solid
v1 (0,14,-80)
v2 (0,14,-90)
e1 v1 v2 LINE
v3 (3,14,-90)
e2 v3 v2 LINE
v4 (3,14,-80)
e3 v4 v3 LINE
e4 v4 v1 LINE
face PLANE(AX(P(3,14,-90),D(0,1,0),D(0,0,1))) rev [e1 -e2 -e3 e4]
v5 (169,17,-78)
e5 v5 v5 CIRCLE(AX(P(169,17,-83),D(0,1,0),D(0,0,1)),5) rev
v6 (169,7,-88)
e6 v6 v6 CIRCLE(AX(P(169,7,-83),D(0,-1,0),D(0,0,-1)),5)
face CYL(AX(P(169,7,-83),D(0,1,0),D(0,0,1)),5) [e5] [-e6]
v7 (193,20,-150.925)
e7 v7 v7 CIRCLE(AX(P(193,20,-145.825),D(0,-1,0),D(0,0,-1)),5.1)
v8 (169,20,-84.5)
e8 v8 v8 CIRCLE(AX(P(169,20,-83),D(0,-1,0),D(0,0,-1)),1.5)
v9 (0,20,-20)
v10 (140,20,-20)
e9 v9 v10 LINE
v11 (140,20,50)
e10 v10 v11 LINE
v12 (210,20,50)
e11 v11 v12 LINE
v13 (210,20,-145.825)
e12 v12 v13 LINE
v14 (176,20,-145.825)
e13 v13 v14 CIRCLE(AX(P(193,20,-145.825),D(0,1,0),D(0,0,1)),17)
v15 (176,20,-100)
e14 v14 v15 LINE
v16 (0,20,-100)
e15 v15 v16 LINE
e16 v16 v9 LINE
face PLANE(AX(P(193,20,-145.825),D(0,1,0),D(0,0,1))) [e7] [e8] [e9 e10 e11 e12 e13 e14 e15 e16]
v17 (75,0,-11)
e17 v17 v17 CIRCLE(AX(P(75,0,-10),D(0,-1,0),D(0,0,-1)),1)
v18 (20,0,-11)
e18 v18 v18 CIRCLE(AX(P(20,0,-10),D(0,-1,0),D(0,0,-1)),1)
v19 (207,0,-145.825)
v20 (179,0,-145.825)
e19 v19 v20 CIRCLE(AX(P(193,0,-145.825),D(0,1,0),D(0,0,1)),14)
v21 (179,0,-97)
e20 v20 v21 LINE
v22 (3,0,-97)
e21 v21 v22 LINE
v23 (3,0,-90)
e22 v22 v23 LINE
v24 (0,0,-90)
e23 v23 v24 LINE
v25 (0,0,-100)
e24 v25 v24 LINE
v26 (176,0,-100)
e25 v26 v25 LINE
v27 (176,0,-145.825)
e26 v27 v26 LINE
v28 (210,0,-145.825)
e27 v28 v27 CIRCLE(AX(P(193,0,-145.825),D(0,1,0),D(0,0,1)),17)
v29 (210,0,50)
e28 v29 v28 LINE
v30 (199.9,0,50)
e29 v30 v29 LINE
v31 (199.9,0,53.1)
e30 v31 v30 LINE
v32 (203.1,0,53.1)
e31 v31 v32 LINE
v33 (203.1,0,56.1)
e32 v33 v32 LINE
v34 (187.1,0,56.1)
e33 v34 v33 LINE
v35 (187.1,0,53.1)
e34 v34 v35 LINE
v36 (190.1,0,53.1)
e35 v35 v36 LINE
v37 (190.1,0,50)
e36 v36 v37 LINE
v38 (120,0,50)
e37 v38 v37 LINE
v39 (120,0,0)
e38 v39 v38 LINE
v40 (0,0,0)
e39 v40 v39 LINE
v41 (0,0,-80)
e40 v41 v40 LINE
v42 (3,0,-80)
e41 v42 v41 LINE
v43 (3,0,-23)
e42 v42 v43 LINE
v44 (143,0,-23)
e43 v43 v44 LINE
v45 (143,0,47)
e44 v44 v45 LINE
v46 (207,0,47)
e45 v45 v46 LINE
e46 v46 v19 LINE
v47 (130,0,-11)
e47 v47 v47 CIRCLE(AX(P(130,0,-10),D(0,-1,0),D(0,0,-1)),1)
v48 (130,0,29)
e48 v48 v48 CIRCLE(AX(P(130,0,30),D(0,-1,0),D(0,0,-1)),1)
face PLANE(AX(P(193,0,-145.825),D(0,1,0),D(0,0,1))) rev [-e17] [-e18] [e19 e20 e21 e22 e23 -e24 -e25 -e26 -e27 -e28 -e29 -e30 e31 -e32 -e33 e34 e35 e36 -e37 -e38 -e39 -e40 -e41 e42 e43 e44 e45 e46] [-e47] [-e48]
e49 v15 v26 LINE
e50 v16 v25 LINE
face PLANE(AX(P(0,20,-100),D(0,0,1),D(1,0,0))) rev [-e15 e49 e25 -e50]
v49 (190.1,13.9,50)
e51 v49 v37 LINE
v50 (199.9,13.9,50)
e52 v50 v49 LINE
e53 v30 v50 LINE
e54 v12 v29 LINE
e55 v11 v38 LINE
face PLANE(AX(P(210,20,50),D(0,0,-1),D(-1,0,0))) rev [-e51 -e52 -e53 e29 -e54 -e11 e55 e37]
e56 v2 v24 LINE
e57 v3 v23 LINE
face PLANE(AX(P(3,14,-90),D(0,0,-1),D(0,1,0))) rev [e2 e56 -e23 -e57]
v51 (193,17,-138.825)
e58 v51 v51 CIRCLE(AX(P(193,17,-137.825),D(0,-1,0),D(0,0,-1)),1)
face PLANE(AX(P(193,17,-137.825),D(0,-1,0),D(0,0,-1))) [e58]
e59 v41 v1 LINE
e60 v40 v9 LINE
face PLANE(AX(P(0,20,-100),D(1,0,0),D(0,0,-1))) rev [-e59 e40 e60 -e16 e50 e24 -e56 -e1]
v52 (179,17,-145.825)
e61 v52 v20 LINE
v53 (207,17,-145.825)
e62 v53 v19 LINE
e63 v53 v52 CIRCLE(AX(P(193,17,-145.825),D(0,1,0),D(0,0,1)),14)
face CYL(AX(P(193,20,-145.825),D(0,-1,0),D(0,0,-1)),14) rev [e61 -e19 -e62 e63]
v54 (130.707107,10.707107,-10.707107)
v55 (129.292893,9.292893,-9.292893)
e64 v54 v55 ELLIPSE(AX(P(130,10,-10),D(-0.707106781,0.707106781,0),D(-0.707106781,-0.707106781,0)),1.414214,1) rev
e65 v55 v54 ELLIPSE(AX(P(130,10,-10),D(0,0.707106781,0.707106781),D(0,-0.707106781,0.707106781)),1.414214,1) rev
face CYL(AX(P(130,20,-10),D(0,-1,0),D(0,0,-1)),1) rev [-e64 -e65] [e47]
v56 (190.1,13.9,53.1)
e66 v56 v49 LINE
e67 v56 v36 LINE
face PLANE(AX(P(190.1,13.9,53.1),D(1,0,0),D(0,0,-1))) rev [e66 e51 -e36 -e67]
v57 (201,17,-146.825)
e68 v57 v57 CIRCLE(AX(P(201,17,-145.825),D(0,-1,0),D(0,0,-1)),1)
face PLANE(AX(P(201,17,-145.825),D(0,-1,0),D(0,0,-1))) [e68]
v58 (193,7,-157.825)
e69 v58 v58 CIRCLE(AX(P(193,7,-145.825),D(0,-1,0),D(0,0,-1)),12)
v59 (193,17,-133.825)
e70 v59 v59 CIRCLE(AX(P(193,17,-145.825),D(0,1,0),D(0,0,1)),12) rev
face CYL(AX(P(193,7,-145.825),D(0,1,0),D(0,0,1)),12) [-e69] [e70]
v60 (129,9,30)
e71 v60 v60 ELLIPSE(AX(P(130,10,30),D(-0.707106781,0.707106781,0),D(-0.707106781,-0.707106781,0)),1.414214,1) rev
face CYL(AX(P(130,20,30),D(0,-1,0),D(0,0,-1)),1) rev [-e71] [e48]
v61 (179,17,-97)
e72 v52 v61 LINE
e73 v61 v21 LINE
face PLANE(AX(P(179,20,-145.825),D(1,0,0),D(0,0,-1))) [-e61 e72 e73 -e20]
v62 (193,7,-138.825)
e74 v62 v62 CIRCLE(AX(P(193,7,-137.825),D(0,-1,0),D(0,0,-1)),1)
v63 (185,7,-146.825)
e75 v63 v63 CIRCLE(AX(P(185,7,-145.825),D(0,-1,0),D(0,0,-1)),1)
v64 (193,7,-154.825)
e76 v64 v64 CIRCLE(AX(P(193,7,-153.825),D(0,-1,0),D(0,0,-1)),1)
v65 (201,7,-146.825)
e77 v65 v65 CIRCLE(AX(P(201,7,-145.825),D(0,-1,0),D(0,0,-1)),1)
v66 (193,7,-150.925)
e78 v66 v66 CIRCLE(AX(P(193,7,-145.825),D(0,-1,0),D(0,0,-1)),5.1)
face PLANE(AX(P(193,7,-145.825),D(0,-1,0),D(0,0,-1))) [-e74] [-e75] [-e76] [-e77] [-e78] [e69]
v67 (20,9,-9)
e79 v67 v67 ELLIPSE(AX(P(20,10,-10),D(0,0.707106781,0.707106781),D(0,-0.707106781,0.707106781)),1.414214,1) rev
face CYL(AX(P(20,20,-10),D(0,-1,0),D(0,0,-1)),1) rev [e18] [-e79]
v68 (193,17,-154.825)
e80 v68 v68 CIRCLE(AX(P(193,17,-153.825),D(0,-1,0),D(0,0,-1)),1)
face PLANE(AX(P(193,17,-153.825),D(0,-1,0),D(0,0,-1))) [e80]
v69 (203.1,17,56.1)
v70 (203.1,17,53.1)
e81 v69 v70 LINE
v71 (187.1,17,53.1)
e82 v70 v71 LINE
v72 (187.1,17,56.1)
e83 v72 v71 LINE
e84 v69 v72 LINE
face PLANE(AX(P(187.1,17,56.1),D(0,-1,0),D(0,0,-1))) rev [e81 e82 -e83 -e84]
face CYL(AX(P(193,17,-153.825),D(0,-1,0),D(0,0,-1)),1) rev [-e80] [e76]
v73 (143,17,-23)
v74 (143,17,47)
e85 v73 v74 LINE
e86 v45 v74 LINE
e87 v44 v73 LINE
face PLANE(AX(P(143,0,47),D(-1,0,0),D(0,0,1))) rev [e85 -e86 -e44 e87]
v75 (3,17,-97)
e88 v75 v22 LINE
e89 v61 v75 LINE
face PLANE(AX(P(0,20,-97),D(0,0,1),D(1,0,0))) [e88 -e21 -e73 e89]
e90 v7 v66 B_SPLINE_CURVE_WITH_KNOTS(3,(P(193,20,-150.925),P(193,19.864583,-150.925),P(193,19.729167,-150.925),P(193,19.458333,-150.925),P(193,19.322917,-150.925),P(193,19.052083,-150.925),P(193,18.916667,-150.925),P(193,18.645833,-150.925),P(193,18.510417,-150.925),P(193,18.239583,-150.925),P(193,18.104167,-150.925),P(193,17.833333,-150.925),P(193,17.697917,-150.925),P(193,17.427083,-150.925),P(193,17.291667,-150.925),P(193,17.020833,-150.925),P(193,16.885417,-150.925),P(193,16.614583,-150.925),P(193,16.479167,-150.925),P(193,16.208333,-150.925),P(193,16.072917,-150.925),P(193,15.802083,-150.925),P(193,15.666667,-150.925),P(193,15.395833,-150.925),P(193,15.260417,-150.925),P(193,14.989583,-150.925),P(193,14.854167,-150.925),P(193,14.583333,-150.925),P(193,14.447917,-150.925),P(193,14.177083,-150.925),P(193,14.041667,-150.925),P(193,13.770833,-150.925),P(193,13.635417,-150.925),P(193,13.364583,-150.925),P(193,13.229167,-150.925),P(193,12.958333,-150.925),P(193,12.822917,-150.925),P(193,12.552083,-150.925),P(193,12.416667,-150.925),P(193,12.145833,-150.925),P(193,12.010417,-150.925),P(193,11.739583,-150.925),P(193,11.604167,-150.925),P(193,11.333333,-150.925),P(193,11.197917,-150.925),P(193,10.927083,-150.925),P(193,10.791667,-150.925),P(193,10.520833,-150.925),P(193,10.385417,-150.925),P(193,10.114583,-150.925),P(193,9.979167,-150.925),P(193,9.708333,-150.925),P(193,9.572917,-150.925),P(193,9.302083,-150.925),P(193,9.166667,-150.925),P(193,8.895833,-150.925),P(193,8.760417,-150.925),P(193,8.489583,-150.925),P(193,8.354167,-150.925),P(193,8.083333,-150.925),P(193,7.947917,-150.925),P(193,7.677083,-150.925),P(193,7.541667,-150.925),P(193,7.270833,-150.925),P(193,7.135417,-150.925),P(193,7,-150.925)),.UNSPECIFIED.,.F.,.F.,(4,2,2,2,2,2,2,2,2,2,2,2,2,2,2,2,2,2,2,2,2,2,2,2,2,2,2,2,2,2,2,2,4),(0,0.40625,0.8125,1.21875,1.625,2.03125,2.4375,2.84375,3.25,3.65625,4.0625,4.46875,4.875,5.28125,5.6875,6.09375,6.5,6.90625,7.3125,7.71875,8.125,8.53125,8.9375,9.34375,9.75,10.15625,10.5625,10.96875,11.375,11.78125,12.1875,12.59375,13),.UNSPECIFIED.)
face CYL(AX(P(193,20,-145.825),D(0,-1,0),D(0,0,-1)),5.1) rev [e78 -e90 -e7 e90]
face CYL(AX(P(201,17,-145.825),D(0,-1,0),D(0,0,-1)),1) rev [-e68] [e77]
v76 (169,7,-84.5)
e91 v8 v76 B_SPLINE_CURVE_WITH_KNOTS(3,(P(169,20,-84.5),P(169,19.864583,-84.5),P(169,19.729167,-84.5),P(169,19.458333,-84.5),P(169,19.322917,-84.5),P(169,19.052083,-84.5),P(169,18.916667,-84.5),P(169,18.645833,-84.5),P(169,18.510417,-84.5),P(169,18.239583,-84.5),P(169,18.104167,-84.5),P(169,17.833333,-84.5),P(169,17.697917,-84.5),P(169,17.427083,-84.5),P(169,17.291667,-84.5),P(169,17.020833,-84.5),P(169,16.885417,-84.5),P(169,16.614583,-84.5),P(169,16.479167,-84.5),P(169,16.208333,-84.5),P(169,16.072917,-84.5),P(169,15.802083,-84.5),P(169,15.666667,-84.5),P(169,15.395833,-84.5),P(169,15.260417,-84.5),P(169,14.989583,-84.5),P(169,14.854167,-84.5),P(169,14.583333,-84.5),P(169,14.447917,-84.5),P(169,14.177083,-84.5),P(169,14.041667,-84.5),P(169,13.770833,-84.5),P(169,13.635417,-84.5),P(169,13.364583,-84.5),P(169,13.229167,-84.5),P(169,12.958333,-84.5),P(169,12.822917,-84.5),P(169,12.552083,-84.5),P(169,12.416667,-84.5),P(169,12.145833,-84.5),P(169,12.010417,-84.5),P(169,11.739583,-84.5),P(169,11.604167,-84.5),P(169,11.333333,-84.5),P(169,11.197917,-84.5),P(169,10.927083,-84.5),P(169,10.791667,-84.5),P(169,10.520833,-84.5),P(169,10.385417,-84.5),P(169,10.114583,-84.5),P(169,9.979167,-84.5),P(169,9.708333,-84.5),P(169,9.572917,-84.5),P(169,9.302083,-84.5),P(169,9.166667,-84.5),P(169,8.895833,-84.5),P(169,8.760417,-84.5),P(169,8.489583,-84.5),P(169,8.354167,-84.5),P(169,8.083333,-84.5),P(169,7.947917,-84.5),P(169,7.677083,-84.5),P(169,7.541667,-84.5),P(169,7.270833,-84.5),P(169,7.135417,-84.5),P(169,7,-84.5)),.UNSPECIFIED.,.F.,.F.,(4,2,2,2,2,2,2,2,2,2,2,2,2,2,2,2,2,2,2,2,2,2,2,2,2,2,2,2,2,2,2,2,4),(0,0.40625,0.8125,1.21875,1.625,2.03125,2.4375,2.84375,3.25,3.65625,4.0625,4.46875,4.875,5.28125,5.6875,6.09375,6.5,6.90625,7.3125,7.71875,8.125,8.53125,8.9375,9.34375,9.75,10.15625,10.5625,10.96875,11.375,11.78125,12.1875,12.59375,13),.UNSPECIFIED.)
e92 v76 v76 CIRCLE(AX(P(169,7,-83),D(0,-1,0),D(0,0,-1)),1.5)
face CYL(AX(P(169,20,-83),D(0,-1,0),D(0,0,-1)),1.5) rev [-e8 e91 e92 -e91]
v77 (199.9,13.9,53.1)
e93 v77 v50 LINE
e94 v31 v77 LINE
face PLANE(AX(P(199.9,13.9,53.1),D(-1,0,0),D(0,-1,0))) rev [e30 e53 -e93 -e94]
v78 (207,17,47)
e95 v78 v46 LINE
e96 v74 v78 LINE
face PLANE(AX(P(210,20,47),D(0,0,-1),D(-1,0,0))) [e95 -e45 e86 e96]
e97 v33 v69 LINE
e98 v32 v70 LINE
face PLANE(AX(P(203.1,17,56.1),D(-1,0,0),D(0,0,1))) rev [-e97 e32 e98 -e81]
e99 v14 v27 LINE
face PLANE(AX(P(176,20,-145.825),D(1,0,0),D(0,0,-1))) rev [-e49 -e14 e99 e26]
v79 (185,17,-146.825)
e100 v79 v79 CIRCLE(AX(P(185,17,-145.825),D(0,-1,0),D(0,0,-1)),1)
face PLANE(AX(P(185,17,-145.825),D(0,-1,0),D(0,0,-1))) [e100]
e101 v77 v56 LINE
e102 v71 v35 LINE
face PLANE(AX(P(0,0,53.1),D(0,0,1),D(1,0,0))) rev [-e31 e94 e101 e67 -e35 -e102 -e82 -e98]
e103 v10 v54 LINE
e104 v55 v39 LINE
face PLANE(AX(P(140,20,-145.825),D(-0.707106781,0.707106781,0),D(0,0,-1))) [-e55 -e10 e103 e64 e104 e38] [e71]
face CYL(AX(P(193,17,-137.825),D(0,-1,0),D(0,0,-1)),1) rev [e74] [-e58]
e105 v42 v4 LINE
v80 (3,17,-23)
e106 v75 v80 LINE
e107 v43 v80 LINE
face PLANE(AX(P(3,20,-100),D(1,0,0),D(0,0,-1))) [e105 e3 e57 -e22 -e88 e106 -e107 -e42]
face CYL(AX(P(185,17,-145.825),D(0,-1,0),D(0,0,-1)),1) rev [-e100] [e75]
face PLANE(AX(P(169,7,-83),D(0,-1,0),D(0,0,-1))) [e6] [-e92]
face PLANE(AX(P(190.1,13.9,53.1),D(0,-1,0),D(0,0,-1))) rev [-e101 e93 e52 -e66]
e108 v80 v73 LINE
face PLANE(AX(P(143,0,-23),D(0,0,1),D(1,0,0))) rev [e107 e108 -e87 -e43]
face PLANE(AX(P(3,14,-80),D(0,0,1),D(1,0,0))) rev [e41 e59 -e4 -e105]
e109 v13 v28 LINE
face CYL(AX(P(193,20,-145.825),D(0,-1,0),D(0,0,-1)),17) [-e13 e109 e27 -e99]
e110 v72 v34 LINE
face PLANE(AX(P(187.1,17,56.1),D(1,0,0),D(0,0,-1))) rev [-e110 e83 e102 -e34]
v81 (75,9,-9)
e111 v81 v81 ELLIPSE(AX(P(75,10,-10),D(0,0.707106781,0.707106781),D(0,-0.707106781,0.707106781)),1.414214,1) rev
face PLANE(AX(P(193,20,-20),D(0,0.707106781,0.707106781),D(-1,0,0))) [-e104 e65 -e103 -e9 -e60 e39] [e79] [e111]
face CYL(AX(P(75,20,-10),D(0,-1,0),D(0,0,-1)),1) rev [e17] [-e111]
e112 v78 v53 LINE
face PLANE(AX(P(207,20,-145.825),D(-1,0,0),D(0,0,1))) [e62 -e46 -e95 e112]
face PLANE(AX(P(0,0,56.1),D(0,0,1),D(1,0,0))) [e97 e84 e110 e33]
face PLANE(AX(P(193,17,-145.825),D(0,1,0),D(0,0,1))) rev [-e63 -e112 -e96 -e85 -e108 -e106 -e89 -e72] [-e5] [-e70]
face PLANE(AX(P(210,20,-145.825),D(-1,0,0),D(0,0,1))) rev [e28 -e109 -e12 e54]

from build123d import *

# Parameters (mm, degrees)
CORNERBOSS_EXTRUDE1_DEPTH               = 20
SHELL1_T                                = -3
PUTBACKPARTOFSHELLBOSS_EXTRUDE1_DEPTH   = 17
TABHOLECUTSSKETCH1_R                    = 1
TABHOLECUTS_EXTRUDE3_DEPTH              = 267.480732183
PADSKETCH2_R                            = 12
PADSKETCH2_R_2                          = 5
PADBOSS_EXTRUDE2_DEPTH                  = 10
STEPPERRODHOLESKETCH3_R                 = 5.1
STEPPERRODHOLESKETCH3_R_2               = 1.5
STEPPERRODHOLECUT_EXTRUDE1_DEPTH        = 267.046951918
THREADEDNUTMOUNTHOLESSKETCH4_R          = 1
THREADEDNUTMOUNTHOLESCUT_EXTRUDE2_DEPTH = 10
TLPEGHOLESKETCH1_W                      = 10
TLPEGHOLESKETCH1_H                      = 14
TLPEGHOLECUT_EXTRUDE1_DEPTH             = 3
BOTTOMPEGSKETCH2_W                      = 9.8
BOTTOMPEGSKETCH2_H                      = 13.9
BOTTOMPEGBOSS_EXTRUDE1_DEPTH            = 3.1
BOTTOMPEGCAPSKETCH3_W                   = 16
BOTTOMPEGCAPSKETCH3_H                   = 17
BOTTOMPEGCAPBOSS_EXTRUDE2_DEPTH         = 3


with BuildPart() as part:
    # CornerSketch1 → CornerBoss-Extrude1 (new body)
    with BuildSketch(Plane(origin=(0, 0, 0), x_dir=(1, 0, 0), z_dir=(0, 1, 0))):
        with BuildLine():
            Line((210, -50), (120, -50))
            Line((120, -50), (120, 0))
            Line((120, 0), (0, 0))
            Line((0, 0), (0, 100))
            Line((0, 100), (176, 100))
            Line((176, 100), (176, 145.825))
            ThreePointArc((176, 145.825), (193, 162.825), (210, 145.825))
            Line((210, 145.825), (210, -50))
        make_face()
    extrude(amount=CORNERBOSS_EXTRUDE1_DEPTH)

    # Shell1
    shell1_openings = [part.faces().sort_by_distance(p)[0] for p in [
        (121.249517572, 0, -43.561989295),
    ]]
    offset(amount=SHELL1_T, openings=shell1_openings, kind=Kind.INTERSECTION)

    # PutBackPartOfShellSketch1 → PutBackPartOfShellBoss-Extrude1 (add)
    with BuildSketch(Plane.XZ.offset(-17)):
        Polygon((3, -3), (123, -3), (123, 47), (143, 47), (143, -23), (3, -23), align=None)
    extrude(amount=PUTBACKPARTOFSHELLBOSS_EXTRUDE1_DEPTH)

    # TabHoleCutsSketch1 → TabHoleCuts-Extrude3 (cut, through all)
    with BuildSketch(Plane.XZ):
        with Locations(Location((130, 30, 0), (0, 0, 270))):
            Circle(TABHOLECUTSSKETCH1_R)
        with Locations(Location((130, -10, 0), (0, 0, 270))):
            Circle(TABHOLECUTSSKETCH1_R)
        with Locations(Location((75, -10, 0), (0, 0, 270))):
            Circle(TABHOLECUTSSKETCH1_R)
        with Locations(Location((20, -10, 0), (0, 0, 270))):
            Circle(TABHOLECUTSSKETCH1_R)
    extrude(amount=-TABHOLECUTS_EXTRUDE3_DEPTH, mode=Mode.SUBTRACT)

    # PadSketch2 → PadBoss-Extrude2 (add)
    with BuildSketch(Plane.XZ.offset(-17)):
        with Locations(Location((193, -145.825, 0), (0, 0, 90))):
            Circle(PADSKETCH2_R)
        with Locations(Location((169, -83, 0), (0, 0, 90))):
            Circle(PADSKETCH2_R_2)
    extrude(amount=PADBOSS_EXTRUDE2_DEPTH)

    # StepperRodHoleSketch3 → StepperRodHoleCut-Extrude1 (cut, through all)
    with BuildSketch(Plane.XZ.offset(-7)):
        with Locations(Location((193, -145.825, 0), (0, 0, 270))):
            Circle(STEPPERRODHOLESKETCH3_R)
        with Locations(Location((169, -83, 0), (0, 0, 270))):
            Circle(STEPPERRODHOLESKETCH3_R_2)
    extrude(amount=-STEPPERRODHOLECUT_EXTRUDE1_DEPTH, mode=Mode.SUBTRACT)

    # ThreadedNutMountHolesSketch4 → ThreadedNutMountHolesCut-Extrude2 (cut)
    with BuildSketch(Plane(origin=(0, 7, 0), x_dir=(-1, 0, 0), z_dir=(0, -1, 0))):
        with Locations(Location((-193, 153.825, 0), (0, 0, 90))):
            Circle(THREADEDNUTMOUNTHOLESSKETCH4_R)
        with Locations(Location((-185, 145.825, 0), (0, 0, 90))):
            Circle(THREADEDNUTMOUNTHOLESSKETCH4_R)
        with Locations(Location((-201, 145.825, 0), (0, 0, 90))):
            Circle(THREADEDNUTMOUNTHOLESSKETCH4_R)
        with Locations(Location((-193, 137.825, 0), (0, 0, 90))):
            Circle(THREADEDNUTMOUNTHOLESSKETCH4_R)
    extrude(amount=-THREADEDNUTMOUNTHOLESCUT_EXTRUDE2_DEPTH, mode=Mode.SUBTRACT)

    # TLPegHoleSketch1 → TLPegHoleCut-Extrude1 (cut)
    with BuildSketch(Plane.ZY):
        with Locations((-85, 7)):
            Rectangle(TLPEGHOLESKETCH1_W, TLPEGHOLESKETCH1_H)
    extrude(amount=-TLPEGHOLECUT_EXTRUDE1_DEPTH, mode=Mode.SUBTRACT)

    # BottomPegSketch2 → BottomPegBoss-Extrude1 (add)
    with BuildSketch(Plane.XY.offset(50)):
        with Locations((195, 6.95)):
            Rectangle(BOTTOMPEGSKETCH2_W, BOTTOMPEGSKETCH2_H)
    extrude(amount=BOTTOMPEGBOSS_EXTRUDE1_DEPTH)

    # BottomPegCapSketch3 → BottomPegCapBoss-Extrude2 (add)
    with BuildSketch(Plane.XY.offset(53.1)):
        with Locations((195.1, 8.5)):
            Rectangle(BOTTOMPEGCAPSKETCH3_W, BOTTOMPEGCAPSKETCH3_H)
    extrude(amount=BOTTOMPEGCAPBOSS_EXTRUDE2_DEPTH)

    # OverlapChamfer1
    # the kernel refuses this chamfer: 20 mm, written as the material it takes off along each edge
    with BuildSketch(Plane(origin=(120, 20, 50), x_dir=(-0.027495876610586317, -0.9996219169112968, 0), z_dir=(0, 0, -1))) as overlapchamfer1_piece_1:
        with BuildLine():
            Line((20.573463904, 0), (-1.130943098, -20.54235587))
            Line((-1.130943098, -20.54235587), (-1.530791864, -20.53135752))
            ThreePointArc((-1.530791864, -20.53135752), (-0.682584541, -10.267956593), (-0.399848767, 0.010998351))
            Line((-0.399848767, 0.010998351), (0.010998351, 0.399848767))
            ThreePointArc((0.010998351, 0.399848767), (10.289953294, 0.117112992), (20.584462254, 0.399848767))
            Line((20.584462254, 0.399848767), (20.573463904, 0))
        make_face()
    extrude(amount=50, mode=Mode.SUBTRACT)
    with BuildSketch(Plane(origin=(120, 20, 0), x_dir=(0, -0.9996219169112968, 0.027495876610586372), z_dir=(-1, 0, 0))) as overlapchamfer1_piece_2:
        with BuildLine():
            Line((20.573463904, 0), (-1.130943098, -20.54235587))
            Line((-1.130943098, -20.54235587), (-1.530791864, -20.53135752))
            ThreePointArc((-1.530791864, -20.53135752), (-0.682584541, -10.267956593), (-0.399848767, 0.010998351))
            Line((-0.399848767, 0.010998351), (0.010998351, 0.399848767))
            ThreePointArc((0.010998351, 0.399848767), (10.289953294, 0.117112992), (20.584462254, 0.399848767))
            Line((20.584462254, 0.399848767), (20.573463904, 0))
        make_face()
    extrude(amount=120, mode=Mode.SUBTRACT)
    with BuildSketch(Plane(origin=(120, 20, 50), x_dir=(-0.027495876610586317, -0.9996219169112968, 0), z_dir=(0, 0, -1))) as overlapchamfer1_piece_3a_section:
        with BuildLine():
            Line((20.573463904, 0), (-1.130943098, -20.54235587))
            Line((-1.130943098, -20.54235587), (-1.530791864, -20.53135752))
            ThreePointArc((-1.530791864, -20.53135752), (-0.682584541, -10.267956593), (-0.399848767, 0.010998351))
            Line((-0.399848767, 0.010998351), (0.010998351, 0.399848767))
            ThreePointArc((0.010998351, 0.399848767), (10.289953294, 0.117112992), (20.584462254, 0.399848767))
            Line((20.584462254, 0.399848767), (20.573463904, 0))
        make_face()
    overlapchamfer1_piece_3a = extrude(amount=101.433659759, mode=Mode.PRIVATE)
    overlapchamfer1_piece_3a = split(overlapchamfer1_piece_3a, bisect_by=Plane(origin=(126.595872536, 13.404127464, 0), z_dir=(0, 0, -1)), keep=Keep.TOP, mode=Mode.PRIVATE)
    with BuildSketch(Plane(origin=(171.433659759, 20, 0), x_dir=(0, -0.9996219169112968, 0.027495876610586372), z_dir=(-1, 0, 0))) as overlapchamfer1_piece_3b_section:
        with BuildLine():
            Line((20.573463904, 0), (-1.130943098, -20.54235587))
            Line((-1.130943098, -20.54235587), (-1.530791864, -20.53135752))
            ThreePointArc((-1.530791864, -20.53135752), (-0.682584541, -10.267956593), (-0.399848767, 0.010998351))
            Line((-0.399848767, 0.010998351), (0.010998351, 0.399848767))
            ThreePointArc((0.010998351, 0.399848767), (10.289953294, 0.117112992), (20.584462254, 0.399848767))
            Line((20.584462254, 0.399848767), (20.573463904, 0))
        make_face()
    overlapchamfer1_piece_3b = extrude(amount=171.433659759, mode=Mode.PRIVATE)
    overlapchamfer1_piece_3b = split(overlapchamfer1_piece_3b, bisect_by=Plane(origin=(120, 13.404127464, -6.595872536), z_dir=(1, 0, 0)), keep=Keep.TOP, mode=Mode.PRIVATE)
    overlapchamfer1_piece_3 = overlapchamfer1_piece_3a & overlapchamfer1_piece_3b
    add(overlapchamfer1_piece_3, mode=Mode.SUBTRACT)


solid = part.part
